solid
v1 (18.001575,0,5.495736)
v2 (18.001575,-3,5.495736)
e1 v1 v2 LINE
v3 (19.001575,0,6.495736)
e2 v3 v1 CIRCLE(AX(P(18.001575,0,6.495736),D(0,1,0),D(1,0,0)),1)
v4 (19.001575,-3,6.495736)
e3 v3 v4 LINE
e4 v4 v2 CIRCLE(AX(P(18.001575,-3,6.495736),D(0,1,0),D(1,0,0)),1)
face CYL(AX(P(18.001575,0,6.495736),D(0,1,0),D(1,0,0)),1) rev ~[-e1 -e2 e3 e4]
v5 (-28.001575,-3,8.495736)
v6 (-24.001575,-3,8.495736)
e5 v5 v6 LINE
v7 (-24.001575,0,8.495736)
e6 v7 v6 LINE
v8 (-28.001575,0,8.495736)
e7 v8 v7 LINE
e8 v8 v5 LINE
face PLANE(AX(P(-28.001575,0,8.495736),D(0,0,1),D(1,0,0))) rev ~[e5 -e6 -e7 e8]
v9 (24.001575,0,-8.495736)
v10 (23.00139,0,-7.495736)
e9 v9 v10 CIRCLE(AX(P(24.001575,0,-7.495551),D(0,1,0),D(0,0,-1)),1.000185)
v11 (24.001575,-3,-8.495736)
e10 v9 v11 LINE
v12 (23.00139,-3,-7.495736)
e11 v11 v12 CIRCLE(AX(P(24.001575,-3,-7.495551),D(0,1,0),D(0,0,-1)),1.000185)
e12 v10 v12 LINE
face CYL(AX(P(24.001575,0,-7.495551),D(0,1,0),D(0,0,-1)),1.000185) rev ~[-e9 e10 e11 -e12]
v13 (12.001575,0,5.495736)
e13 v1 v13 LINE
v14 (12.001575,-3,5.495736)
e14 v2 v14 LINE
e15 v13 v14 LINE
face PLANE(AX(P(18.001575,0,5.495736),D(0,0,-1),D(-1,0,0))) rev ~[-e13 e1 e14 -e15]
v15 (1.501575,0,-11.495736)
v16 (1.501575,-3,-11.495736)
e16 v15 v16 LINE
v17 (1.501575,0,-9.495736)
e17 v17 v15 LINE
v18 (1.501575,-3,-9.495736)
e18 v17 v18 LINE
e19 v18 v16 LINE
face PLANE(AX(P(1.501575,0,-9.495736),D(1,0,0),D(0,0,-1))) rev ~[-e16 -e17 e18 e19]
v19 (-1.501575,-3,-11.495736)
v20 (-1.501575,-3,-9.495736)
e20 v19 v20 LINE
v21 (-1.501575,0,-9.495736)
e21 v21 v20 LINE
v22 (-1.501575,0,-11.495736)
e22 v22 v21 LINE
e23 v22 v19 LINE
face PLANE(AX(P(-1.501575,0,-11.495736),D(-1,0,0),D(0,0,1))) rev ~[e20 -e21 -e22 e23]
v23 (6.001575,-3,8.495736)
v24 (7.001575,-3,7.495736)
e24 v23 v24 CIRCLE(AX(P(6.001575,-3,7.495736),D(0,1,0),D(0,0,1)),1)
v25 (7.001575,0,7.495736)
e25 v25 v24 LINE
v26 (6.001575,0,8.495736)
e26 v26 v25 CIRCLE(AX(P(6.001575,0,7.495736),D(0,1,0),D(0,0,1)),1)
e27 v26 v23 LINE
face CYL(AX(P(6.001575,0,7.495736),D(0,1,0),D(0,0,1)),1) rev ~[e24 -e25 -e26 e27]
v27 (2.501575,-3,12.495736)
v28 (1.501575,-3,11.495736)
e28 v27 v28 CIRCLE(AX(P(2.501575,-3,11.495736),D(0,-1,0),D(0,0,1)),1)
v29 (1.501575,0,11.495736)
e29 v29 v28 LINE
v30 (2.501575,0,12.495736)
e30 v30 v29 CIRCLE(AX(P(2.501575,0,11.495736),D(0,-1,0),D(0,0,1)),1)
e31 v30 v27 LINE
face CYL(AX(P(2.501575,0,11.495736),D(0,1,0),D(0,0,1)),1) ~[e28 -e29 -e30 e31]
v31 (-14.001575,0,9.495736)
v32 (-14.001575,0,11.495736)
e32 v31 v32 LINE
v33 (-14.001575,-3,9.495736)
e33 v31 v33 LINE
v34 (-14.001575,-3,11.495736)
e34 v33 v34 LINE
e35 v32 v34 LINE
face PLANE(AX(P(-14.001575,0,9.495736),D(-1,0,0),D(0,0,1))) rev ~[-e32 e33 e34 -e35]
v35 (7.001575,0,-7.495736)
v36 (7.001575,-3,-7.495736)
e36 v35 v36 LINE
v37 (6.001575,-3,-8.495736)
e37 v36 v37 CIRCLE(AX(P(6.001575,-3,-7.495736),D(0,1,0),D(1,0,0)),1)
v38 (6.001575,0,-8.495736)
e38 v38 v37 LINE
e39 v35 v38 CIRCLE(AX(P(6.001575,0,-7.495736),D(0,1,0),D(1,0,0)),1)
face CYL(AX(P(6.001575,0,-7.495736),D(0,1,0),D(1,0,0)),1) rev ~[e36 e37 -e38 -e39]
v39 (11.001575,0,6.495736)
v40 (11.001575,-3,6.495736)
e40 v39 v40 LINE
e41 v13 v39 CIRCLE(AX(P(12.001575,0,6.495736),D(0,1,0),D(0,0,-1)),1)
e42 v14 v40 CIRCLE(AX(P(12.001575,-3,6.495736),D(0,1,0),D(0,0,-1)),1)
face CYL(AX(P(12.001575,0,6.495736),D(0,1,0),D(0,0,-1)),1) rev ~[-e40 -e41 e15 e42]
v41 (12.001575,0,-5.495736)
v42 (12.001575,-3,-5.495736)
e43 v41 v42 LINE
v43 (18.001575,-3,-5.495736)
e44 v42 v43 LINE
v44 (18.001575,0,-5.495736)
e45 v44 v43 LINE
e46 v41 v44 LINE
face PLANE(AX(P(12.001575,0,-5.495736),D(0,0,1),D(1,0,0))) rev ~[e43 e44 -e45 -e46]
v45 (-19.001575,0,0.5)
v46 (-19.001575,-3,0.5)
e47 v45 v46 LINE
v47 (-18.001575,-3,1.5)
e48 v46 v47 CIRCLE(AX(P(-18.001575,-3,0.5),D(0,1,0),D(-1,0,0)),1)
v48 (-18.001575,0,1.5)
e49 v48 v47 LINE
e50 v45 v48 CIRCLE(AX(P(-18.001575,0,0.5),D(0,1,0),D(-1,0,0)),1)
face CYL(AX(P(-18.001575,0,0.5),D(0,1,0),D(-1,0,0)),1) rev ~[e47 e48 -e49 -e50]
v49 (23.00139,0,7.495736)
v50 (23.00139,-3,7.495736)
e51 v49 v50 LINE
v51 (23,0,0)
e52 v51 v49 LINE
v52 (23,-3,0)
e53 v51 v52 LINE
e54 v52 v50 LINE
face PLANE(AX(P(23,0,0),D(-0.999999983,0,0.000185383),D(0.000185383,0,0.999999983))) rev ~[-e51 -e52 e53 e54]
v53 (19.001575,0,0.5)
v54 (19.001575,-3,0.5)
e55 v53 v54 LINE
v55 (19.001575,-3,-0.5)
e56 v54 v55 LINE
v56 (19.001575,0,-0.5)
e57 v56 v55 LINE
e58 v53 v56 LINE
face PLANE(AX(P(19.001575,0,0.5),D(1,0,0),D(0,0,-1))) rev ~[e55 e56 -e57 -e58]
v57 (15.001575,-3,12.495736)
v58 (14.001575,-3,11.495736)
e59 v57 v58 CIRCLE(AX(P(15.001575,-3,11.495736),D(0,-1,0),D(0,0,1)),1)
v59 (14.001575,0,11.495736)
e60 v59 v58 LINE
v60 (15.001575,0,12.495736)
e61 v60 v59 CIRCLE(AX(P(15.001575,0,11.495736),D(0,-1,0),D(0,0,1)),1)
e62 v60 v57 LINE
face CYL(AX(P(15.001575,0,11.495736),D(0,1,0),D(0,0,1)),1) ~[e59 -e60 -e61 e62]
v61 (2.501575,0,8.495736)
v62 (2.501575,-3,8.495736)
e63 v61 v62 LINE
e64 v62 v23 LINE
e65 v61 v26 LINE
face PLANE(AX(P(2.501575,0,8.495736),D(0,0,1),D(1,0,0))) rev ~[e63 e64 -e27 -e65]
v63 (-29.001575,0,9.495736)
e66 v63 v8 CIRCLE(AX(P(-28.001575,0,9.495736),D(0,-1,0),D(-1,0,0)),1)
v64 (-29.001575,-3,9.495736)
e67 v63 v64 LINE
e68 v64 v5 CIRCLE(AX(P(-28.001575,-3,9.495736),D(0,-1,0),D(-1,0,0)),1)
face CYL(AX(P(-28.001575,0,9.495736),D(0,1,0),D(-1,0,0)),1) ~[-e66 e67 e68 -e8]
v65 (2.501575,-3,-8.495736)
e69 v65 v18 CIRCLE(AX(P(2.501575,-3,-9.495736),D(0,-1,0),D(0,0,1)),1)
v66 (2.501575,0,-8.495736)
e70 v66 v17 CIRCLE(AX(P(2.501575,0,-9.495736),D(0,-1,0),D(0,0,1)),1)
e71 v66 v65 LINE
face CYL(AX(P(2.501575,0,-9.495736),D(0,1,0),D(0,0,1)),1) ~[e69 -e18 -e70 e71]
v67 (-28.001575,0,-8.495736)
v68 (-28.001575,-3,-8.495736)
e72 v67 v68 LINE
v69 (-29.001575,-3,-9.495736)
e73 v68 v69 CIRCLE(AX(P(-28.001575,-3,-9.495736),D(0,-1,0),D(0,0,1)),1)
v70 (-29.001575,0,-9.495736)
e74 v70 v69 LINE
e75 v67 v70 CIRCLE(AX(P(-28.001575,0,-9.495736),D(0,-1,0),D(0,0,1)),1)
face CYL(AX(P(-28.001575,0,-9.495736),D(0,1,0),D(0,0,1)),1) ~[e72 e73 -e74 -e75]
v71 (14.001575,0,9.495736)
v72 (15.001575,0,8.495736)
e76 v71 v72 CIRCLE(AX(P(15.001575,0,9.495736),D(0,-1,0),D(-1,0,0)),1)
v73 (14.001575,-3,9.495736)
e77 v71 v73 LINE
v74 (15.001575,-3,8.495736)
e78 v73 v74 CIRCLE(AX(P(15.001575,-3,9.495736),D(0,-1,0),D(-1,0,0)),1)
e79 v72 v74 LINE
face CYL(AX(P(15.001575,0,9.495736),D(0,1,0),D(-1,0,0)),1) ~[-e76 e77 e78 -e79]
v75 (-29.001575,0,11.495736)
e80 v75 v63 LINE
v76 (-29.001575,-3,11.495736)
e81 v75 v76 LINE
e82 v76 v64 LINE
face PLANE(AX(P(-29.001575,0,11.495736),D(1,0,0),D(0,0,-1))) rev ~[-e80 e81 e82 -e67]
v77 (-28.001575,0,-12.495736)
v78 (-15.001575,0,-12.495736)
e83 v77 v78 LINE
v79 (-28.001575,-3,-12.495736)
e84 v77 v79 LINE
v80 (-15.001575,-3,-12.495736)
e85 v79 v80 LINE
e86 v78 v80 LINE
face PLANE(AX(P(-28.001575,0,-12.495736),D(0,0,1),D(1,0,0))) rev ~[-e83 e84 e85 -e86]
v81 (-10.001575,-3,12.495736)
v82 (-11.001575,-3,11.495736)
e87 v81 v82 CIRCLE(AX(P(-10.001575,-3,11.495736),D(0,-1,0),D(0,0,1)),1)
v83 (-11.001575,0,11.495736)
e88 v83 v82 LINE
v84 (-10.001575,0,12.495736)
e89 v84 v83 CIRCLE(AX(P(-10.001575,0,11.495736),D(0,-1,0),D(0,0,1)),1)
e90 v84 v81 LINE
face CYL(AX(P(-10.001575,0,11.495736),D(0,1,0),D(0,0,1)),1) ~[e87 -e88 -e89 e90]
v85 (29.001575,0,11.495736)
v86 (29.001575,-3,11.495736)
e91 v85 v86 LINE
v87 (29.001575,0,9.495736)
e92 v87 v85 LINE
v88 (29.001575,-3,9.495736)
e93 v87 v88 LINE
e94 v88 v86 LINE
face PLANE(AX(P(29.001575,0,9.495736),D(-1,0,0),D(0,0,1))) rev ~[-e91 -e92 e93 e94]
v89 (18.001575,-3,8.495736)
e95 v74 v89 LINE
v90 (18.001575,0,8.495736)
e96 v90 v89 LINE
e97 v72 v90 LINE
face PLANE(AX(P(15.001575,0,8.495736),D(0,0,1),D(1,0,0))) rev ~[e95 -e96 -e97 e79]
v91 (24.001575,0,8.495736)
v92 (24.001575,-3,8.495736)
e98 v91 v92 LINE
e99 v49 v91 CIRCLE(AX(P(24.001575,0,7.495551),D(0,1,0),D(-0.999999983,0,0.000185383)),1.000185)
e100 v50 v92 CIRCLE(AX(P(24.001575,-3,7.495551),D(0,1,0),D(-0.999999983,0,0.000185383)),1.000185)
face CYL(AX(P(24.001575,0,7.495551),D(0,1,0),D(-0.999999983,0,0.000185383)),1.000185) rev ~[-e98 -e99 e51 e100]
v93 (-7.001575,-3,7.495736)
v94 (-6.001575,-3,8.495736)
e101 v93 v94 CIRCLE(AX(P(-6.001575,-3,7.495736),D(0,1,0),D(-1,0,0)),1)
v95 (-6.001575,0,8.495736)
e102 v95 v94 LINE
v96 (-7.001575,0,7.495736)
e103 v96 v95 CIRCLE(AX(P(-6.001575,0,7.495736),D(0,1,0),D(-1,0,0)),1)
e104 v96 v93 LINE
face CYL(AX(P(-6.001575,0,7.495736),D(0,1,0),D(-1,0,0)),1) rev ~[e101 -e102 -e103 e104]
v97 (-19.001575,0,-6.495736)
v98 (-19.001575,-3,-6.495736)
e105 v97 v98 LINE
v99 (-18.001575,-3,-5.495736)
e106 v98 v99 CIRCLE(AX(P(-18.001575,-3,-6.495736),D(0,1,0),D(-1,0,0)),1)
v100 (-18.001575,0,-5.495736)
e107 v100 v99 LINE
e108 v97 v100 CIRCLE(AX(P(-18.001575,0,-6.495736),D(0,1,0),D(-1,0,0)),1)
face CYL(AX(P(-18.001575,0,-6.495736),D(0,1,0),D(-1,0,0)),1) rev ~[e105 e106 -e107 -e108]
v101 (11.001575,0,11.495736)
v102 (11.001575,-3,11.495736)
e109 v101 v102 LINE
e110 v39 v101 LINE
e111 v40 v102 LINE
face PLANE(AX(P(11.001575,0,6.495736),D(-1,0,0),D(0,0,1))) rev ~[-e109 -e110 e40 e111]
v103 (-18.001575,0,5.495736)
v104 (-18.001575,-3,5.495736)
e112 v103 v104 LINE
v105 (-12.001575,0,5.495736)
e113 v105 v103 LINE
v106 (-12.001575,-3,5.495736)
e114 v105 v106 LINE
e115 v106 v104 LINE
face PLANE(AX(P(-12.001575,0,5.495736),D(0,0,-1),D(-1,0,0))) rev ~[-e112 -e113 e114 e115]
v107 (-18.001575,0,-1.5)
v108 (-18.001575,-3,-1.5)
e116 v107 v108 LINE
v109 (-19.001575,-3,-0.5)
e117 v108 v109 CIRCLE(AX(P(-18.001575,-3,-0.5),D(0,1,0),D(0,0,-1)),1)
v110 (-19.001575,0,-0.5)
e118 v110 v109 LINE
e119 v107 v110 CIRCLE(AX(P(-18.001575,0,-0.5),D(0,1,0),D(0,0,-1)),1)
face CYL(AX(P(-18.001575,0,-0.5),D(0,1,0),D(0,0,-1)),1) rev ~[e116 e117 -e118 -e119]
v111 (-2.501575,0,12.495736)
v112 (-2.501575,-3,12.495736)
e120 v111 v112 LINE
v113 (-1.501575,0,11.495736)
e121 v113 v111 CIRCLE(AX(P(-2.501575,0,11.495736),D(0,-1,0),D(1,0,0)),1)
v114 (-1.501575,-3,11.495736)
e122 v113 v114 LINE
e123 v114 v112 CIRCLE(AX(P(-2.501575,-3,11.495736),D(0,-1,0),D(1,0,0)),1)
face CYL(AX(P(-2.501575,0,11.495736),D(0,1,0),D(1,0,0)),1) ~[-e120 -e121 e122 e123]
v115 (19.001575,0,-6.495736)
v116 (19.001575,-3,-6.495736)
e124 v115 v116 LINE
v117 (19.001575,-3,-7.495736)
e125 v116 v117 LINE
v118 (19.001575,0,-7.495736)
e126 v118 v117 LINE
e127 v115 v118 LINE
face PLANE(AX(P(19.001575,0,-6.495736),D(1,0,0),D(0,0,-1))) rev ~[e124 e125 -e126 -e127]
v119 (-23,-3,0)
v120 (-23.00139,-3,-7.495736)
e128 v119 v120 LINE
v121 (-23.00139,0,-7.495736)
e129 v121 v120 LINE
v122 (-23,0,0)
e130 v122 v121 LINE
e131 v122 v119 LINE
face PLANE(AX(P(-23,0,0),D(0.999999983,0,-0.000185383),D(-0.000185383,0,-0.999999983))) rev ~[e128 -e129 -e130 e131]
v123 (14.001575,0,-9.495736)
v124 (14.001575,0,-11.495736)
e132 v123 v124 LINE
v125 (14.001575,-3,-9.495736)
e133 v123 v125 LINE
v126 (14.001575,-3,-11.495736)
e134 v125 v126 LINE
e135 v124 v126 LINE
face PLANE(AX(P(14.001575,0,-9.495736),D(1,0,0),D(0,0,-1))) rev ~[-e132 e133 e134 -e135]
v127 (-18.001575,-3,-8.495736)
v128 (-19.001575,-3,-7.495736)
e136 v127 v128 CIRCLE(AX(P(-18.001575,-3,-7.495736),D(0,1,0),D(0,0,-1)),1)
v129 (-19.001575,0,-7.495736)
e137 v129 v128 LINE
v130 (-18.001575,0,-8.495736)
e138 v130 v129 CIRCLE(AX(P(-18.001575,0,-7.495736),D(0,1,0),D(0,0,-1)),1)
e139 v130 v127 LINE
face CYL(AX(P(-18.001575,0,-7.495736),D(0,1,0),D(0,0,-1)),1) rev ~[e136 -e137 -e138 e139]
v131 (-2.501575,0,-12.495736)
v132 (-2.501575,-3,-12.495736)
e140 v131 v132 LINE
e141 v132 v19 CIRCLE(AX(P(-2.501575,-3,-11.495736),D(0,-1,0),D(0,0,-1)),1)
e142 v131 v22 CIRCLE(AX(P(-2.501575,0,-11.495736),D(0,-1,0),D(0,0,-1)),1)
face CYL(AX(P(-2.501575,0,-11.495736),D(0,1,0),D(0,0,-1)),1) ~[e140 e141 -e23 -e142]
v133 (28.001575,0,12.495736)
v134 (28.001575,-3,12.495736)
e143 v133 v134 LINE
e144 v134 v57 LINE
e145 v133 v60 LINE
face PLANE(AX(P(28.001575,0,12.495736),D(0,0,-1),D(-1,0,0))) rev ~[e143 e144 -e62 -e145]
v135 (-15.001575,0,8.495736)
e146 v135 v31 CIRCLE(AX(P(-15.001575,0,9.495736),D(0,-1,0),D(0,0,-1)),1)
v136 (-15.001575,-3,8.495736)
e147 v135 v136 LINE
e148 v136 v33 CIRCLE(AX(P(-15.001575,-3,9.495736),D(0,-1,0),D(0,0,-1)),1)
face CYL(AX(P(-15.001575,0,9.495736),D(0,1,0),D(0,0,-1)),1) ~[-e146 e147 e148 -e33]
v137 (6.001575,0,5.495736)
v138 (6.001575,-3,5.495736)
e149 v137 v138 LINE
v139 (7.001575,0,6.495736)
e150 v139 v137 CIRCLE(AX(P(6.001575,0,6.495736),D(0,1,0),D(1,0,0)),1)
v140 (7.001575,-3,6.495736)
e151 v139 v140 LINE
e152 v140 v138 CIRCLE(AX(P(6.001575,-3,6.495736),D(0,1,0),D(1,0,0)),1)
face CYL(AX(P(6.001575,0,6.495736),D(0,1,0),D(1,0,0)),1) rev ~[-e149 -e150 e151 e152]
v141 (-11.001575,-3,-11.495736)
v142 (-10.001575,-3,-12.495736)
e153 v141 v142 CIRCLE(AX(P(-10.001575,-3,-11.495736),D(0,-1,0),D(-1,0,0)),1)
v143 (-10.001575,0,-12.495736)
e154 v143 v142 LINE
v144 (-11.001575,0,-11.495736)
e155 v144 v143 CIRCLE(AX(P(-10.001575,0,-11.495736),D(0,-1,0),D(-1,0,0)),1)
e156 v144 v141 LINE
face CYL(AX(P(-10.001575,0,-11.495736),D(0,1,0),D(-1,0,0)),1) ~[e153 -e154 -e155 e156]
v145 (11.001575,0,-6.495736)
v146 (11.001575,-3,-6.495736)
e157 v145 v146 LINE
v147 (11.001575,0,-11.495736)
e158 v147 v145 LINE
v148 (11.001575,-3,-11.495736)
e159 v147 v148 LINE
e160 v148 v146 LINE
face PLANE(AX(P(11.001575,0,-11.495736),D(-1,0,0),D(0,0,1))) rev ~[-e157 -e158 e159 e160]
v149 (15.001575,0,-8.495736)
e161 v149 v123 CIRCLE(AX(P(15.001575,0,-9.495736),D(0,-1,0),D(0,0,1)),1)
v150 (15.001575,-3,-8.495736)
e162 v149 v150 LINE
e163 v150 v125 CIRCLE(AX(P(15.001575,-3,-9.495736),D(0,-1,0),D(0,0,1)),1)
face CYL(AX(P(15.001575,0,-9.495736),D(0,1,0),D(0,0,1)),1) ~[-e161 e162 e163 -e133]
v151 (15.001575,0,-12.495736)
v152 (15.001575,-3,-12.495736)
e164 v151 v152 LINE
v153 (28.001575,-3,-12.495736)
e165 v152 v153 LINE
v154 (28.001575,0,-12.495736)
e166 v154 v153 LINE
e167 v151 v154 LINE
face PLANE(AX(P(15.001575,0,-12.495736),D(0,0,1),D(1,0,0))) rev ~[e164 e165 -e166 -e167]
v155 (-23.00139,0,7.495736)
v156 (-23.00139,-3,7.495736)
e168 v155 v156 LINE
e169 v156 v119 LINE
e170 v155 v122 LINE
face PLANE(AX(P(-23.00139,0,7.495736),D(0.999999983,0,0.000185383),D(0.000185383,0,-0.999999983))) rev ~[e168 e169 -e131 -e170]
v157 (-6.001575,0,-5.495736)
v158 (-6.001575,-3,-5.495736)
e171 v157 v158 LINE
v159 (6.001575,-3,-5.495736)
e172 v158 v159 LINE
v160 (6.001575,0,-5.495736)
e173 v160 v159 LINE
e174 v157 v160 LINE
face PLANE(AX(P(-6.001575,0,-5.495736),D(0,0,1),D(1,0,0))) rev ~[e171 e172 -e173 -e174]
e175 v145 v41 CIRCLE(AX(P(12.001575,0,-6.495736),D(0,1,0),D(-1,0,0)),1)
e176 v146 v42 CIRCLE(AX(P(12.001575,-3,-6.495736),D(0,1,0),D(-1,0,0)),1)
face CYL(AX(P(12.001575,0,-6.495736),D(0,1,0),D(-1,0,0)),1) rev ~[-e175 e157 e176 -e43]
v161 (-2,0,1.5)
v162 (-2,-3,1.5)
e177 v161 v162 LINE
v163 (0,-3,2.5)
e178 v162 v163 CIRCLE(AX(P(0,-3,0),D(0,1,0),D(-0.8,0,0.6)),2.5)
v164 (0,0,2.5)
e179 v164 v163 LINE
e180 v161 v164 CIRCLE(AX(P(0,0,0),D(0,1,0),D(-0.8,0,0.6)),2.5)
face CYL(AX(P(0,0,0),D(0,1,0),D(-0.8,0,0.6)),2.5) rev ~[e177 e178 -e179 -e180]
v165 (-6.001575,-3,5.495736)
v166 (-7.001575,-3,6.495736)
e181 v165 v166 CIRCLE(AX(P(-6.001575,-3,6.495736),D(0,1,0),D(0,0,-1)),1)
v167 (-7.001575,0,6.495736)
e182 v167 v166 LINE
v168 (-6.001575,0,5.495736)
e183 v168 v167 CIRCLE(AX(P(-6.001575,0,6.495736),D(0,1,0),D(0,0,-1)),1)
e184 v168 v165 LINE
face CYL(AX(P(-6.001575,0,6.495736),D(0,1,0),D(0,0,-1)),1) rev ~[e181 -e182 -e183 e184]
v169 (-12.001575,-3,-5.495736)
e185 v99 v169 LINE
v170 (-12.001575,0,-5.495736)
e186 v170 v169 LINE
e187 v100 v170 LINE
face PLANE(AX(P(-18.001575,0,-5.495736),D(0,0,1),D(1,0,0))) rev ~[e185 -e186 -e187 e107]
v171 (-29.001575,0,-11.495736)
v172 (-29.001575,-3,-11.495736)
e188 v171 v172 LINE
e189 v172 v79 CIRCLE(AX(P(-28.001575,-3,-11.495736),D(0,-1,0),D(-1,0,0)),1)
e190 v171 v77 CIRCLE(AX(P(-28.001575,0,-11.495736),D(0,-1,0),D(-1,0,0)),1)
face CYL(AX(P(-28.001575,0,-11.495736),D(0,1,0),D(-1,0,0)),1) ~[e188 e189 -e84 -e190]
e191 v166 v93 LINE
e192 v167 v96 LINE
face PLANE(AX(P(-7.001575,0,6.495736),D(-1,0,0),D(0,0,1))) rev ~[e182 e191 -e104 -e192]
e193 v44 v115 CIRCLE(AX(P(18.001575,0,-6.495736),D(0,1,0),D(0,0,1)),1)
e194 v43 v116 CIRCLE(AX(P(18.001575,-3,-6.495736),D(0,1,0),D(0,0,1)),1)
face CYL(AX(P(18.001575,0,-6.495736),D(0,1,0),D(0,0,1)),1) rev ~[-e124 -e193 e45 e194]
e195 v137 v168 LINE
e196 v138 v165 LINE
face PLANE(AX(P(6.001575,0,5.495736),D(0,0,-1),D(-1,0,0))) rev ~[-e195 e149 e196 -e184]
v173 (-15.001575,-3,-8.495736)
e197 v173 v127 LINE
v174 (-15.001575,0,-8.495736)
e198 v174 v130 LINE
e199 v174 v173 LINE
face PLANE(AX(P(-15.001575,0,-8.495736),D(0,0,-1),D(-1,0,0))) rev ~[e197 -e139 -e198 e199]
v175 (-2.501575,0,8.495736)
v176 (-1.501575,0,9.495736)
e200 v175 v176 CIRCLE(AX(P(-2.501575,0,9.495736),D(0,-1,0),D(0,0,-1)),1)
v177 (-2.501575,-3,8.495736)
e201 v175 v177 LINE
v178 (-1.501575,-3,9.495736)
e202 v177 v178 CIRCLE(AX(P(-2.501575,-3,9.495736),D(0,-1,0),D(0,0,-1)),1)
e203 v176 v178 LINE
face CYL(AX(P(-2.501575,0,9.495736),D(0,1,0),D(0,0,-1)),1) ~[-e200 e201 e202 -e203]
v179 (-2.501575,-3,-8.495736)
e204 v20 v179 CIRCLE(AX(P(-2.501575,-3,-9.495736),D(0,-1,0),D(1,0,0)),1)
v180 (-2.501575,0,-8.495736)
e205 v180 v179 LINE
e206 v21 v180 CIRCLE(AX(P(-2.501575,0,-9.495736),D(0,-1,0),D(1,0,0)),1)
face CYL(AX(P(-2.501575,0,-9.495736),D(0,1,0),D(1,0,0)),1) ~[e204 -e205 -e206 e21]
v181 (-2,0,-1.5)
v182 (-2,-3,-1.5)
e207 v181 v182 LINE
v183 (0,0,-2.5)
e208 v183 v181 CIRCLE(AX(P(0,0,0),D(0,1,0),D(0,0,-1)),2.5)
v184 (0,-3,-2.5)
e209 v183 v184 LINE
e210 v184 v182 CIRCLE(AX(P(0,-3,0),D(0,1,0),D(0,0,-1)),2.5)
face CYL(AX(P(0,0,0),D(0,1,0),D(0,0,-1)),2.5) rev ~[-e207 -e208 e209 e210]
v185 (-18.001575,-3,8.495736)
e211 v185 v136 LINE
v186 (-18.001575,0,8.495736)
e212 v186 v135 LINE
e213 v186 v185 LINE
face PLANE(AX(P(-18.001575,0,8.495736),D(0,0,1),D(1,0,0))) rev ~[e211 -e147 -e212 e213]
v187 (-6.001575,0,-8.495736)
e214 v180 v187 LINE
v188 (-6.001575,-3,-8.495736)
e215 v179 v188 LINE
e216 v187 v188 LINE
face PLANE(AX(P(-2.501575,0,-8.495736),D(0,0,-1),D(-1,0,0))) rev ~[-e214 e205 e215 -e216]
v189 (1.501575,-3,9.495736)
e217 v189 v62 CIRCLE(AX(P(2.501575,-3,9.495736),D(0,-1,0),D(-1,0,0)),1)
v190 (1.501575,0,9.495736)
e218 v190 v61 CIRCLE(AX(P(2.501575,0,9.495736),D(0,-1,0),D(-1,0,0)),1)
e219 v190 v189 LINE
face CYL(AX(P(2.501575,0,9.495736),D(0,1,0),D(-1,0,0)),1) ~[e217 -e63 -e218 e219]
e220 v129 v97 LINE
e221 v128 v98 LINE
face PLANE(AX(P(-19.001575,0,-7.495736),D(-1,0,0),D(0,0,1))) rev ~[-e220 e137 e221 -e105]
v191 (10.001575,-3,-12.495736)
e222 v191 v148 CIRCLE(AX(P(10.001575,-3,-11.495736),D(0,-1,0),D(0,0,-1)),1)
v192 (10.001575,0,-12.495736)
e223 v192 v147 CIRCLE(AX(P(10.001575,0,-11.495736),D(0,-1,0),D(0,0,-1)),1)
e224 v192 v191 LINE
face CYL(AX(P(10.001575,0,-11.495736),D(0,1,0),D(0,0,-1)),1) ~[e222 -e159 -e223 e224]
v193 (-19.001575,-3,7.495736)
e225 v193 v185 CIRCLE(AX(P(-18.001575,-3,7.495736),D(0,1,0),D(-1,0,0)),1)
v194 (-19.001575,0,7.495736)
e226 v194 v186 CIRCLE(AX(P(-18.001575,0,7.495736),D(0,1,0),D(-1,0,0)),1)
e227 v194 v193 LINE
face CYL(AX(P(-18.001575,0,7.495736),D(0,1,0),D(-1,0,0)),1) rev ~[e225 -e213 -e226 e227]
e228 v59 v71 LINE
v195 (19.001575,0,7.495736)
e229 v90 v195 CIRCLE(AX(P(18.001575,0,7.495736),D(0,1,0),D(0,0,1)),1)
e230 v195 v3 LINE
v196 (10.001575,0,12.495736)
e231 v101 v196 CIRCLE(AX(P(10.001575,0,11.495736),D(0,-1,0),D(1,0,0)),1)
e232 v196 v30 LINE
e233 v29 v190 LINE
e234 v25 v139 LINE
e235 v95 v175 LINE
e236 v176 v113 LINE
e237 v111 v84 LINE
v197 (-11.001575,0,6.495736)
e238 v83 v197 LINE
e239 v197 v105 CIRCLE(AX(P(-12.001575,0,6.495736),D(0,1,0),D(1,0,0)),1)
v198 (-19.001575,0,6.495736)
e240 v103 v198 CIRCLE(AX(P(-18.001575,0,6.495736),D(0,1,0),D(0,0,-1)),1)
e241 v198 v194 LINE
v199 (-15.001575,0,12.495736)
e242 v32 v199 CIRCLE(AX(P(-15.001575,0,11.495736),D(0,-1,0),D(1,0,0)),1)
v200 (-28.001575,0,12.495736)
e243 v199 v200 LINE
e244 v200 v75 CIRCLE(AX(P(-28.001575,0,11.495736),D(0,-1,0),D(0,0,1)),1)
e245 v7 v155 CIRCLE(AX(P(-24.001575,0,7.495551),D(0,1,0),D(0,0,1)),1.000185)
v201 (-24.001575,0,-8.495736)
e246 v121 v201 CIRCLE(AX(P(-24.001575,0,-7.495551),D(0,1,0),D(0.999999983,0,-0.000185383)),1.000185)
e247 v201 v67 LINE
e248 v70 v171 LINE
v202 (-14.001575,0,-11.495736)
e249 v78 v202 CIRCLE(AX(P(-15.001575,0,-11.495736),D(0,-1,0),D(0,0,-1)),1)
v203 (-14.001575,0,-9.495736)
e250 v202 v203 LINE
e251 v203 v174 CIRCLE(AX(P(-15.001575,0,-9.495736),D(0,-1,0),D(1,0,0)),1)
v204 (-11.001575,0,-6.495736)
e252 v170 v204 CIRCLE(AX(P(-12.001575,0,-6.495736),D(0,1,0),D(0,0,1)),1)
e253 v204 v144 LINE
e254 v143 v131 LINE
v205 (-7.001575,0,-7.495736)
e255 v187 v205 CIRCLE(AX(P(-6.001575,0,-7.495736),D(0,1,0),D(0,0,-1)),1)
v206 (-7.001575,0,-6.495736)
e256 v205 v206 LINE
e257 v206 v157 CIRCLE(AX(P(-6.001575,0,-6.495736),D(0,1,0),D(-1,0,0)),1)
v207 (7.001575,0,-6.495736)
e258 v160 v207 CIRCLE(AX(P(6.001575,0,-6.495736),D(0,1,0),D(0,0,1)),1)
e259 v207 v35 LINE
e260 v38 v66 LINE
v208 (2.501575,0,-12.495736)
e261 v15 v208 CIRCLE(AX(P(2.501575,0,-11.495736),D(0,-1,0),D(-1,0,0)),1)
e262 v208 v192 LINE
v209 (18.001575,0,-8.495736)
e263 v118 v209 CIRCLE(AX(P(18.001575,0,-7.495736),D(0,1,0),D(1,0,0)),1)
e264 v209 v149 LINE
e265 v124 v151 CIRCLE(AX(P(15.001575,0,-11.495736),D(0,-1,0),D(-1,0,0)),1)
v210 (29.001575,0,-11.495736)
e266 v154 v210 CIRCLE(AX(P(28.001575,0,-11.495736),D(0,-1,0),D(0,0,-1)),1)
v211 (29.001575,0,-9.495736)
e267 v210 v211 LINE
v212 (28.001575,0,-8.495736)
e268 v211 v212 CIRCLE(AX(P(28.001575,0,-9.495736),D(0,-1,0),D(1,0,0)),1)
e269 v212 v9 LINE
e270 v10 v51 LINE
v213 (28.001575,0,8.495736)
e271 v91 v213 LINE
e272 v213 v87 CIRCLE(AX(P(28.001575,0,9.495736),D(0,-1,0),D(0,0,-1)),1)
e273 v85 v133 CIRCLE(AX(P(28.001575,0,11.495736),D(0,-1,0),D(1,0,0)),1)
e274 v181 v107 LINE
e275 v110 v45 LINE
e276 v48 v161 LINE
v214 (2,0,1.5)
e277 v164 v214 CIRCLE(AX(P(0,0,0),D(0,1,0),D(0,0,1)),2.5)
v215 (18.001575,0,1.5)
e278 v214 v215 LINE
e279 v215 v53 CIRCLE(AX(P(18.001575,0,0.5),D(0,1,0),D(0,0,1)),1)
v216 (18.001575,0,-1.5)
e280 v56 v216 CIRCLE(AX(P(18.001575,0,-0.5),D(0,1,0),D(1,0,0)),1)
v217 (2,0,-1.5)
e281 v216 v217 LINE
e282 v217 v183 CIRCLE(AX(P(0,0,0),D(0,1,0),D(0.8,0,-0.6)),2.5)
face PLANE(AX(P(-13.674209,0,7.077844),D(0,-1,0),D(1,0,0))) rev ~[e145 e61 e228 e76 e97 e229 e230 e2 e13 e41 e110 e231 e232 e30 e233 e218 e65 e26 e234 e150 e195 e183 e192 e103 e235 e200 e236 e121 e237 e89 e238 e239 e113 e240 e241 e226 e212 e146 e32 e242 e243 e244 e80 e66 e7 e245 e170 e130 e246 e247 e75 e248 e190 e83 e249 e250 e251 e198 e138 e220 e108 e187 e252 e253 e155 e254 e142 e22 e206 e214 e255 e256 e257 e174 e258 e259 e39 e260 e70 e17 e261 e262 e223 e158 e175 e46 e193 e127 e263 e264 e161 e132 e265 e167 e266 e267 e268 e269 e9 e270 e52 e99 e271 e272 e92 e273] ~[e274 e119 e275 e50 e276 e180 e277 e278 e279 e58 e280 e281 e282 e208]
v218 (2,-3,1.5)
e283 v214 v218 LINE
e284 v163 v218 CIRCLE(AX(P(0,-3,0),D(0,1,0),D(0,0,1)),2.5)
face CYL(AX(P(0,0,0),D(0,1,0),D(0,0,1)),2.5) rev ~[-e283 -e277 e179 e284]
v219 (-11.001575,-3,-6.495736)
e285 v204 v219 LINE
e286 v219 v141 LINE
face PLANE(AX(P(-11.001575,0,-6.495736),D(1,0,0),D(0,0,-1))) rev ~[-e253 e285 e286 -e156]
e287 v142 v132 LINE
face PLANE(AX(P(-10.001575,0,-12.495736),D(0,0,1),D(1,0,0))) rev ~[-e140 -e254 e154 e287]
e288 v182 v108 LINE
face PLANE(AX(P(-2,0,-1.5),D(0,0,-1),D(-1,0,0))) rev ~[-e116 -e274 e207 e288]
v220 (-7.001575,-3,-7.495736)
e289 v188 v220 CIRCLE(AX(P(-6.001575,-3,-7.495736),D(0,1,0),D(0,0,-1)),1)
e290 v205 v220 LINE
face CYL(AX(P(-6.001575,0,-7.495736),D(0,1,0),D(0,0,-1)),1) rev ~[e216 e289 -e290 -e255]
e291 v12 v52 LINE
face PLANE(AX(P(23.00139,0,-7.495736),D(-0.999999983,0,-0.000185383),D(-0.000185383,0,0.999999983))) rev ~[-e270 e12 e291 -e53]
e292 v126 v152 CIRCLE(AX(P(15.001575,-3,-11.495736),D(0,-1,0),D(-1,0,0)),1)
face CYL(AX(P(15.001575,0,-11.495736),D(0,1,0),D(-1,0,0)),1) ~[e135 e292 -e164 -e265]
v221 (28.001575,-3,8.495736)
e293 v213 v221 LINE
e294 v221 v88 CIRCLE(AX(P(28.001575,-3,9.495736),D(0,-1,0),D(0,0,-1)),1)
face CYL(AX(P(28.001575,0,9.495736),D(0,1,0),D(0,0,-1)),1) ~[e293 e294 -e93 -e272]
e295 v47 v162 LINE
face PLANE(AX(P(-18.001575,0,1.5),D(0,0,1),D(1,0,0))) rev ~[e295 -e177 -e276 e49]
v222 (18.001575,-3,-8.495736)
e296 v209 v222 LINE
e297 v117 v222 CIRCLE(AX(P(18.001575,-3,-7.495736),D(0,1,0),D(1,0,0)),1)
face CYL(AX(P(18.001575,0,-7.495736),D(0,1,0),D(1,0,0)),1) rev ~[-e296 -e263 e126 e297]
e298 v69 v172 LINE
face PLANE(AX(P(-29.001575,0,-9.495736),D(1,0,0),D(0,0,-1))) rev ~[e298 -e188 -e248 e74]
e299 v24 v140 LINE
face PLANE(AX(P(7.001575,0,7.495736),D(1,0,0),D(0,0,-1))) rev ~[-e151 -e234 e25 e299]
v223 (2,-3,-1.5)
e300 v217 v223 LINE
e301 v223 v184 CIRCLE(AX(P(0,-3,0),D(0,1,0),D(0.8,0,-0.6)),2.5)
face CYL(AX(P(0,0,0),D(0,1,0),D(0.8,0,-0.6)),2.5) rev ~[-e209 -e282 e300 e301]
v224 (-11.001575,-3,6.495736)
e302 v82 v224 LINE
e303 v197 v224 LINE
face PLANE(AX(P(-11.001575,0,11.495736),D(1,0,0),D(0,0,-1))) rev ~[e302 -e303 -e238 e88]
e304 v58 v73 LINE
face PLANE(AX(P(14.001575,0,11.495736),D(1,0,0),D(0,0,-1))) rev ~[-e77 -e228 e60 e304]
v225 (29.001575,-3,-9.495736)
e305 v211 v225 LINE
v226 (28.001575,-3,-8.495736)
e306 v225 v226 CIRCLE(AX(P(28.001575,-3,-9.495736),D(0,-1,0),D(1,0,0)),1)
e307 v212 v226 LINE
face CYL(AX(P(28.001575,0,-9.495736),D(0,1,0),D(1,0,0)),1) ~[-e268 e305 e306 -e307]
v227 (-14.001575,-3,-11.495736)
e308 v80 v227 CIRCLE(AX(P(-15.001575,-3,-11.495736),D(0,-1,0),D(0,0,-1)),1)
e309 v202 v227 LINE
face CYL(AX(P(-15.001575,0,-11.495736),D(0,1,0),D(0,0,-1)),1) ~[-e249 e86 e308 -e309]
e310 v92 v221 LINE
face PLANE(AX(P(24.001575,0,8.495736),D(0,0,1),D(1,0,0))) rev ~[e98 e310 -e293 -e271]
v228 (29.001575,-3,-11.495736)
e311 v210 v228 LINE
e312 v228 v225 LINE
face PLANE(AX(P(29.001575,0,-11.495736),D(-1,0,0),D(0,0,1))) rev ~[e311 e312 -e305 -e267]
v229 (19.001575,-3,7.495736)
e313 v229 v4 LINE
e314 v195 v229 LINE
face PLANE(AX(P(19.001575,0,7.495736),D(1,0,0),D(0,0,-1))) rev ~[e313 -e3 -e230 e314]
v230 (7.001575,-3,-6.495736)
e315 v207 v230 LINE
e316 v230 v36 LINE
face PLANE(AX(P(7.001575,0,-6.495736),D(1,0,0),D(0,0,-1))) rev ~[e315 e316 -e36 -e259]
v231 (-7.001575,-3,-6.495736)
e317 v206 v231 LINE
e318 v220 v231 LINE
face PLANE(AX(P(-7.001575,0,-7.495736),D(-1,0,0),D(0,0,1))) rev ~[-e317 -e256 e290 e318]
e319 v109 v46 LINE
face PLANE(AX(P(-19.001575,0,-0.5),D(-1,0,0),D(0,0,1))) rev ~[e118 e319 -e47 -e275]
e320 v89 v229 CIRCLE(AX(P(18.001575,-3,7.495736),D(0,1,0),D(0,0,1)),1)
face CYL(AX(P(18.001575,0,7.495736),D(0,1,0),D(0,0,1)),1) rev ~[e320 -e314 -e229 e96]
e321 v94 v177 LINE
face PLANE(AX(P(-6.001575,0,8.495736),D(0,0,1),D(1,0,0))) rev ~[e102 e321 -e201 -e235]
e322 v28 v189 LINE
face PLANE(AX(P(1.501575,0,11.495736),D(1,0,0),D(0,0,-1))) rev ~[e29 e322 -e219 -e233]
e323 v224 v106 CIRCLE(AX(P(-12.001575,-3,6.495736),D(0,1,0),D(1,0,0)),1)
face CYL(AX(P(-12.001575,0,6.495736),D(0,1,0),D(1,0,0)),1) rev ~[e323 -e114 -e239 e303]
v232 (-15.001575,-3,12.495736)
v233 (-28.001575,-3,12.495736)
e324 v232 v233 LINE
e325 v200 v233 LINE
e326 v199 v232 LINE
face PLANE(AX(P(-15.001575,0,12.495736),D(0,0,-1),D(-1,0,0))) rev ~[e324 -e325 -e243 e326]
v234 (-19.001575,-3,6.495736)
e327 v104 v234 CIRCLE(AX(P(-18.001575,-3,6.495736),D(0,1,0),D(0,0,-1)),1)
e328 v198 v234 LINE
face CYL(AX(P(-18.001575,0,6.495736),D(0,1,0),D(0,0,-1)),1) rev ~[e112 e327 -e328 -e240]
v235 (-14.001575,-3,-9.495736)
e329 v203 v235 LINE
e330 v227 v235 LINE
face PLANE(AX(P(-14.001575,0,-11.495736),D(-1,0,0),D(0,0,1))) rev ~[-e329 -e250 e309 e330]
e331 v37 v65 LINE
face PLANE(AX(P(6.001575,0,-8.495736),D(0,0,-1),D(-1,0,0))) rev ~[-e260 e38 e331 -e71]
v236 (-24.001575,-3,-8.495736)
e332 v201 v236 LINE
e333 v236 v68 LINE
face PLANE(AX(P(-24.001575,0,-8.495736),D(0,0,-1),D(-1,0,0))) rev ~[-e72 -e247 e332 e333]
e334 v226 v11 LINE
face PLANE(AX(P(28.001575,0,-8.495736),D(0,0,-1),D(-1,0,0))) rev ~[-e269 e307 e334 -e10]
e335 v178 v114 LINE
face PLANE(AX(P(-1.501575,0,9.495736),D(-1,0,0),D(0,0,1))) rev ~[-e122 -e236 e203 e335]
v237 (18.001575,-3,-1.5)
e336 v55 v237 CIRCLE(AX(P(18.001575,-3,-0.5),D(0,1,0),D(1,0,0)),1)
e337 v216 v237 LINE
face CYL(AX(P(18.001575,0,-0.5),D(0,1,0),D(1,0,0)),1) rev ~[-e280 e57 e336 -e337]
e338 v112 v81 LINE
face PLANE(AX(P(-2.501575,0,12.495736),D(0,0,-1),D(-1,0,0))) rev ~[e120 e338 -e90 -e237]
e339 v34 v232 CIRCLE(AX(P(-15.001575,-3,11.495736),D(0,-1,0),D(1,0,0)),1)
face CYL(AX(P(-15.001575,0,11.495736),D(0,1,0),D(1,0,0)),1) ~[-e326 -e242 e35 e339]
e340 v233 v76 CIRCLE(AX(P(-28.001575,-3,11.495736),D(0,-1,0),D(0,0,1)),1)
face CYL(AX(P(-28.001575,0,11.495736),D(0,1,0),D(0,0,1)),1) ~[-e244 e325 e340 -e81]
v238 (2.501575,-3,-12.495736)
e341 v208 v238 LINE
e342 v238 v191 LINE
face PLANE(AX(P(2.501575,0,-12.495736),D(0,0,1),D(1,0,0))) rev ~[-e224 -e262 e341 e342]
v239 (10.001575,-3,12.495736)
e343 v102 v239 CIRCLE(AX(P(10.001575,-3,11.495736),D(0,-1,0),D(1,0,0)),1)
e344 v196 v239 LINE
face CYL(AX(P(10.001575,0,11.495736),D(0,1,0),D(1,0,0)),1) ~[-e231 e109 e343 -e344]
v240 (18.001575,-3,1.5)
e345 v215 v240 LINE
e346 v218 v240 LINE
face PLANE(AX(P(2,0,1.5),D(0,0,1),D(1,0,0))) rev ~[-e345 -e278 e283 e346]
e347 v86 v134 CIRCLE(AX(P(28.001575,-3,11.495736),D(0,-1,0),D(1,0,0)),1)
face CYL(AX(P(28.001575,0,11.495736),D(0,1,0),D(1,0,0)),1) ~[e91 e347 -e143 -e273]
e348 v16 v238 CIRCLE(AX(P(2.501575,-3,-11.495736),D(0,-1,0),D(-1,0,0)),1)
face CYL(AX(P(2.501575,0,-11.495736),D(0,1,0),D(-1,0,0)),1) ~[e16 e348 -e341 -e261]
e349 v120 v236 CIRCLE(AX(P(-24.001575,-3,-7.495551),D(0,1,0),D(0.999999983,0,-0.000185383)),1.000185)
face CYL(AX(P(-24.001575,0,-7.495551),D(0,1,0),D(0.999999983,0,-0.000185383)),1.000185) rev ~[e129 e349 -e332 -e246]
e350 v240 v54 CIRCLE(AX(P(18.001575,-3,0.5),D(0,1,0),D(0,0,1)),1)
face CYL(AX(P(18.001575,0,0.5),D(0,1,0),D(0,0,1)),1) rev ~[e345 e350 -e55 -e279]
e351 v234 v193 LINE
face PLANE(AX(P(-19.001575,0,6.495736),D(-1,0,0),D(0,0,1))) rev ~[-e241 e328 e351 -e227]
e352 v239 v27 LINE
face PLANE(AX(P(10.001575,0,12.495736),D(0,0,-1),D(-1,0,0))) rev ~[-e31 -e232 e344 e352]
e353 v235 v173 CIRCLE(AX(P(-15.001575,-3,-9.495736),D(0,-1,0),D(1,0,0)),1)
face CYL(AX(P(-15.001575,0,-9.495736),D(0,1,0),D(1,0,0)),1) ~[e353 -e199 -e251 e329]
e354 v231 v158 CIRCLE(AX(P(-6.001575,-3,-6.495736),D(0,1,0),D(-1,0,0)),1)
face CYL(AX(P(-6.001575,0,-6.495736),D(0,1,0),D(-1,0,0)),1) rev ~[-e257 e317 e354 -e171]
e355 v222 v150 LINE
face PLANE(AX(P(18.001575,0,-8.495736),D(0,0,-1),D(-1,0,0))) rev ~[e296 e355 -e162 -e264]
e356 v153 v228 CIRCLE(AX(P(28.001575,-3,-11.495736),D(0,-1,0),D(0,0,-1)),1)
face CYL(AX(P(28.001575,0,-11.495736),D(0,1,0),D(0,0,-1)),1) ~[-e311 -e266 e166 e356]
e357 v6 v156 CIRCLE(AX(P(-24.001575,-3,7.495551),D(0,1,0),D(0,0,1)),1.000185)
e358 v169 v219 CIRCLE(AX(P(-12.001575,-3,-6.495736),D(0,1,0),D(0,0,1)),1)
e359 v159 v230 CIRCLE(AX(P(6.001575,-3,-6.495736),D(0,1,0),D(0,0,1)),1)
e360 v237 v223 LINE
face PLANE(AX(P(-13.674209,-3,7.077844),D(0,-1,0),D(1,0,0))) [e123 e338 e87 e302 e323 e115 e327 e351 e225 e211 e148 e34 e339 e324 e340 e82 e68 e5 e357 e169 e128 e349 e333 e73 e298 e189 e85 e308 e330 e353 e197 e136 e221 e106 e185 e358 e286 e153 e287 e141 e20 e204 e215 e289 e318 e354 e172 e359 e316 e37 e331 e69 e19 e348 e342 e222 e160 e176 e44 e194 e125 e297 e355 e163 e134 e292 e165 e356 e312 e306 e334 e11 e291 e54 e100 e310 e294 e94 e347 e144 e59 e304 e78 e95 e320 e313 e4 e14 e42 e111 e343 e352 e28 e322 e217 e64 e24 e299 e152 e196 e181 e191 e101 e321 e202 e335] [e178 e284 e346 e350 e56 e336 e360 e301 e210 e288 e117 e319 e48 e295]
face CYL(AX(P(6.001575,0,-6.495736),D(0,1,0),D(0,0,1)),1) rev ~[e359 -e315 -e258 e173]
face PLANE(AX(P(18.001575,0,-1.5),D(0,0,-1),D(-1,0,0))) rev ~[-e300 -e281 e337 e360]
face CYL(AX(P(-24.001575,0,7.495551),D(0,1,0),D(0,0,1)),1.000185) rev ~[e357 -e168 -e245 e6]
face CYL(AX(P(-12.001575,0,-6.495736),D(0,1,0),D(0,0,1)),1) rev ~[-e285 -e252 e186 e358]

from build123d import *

# Parameters (mm, degrees)
F1_DEPTH = 3


# Not quite as in the source:
# - a feature names something its author has since deleted; it is built from what else it names


with BuildPart() as f1:
    # F0 (on Front) → F1 (new body)
    with BuildSketch(Plane.XZ):
        with BuildLine():
            Line((-23.0000003952, 0), (-19.0015753579, 0))
            Line((-19.0015753579, 0), (-19.0015753579, 0.5))
            ThreePointArc((-19.0015753579, 0.5), (-18.7086821391, 1.2071067812), (-18.0015753579, 1.5))
            Line((-18.0015753579, 1.5), (-2, 1.5))
            ThreePointArc((-2, 1.5), (-1.1180339887, 2.2360679775), (0, 2.5))
            Line((0, 2.5), (0, 5.4957361976))
            Line((0, 5.4957361976), (-6.0015753579, 5.4957361976))
            ThreePointArc((-6.0015753579, 5.4957361976), (-6.7086821391, 5.7886294164), (-7.0015753579, 6.4957361976))
            Line((-7.0015753579, 6.4957361976), (-7.0015753579, 7.4957361976))
            ThreePointArc((-7.0015753579, 7.4957361976), (-6.7086821391, 8.2028429788), (-6.0015753579, 8.4957361976))
            Line((-6.0015753579, 8.4957361976), (-2.5015753579, 8.4957361976))
            ThreePointArc((-2.5015753579, 8.4957361976), (-1.7944685767, 8.7886294164), (-1.5015753579, 9.4957361976))
            Line((-1.5015753579, 9.4957361976), (-1.5015753579, 11.4957361976))
            ThreePointArc((-1.5015753579, 11.4957361976), (-1.7944685767, 12.2028429788), (-2.5015753579, 12.4957361976))
            Line((-2.5015753579, 12.4957361976), (-10.0015753579, 12.4957361976))
            ThreePointArc((-10.0015753579, 12.4957361976), (-10.7086821391, 12.2028429788), (-11.0015753579, 11.4957361976))
            Line((-11.0015753579, 11.4957361976), (-11.0015753579, 8.4957361976))
            Line((-11.0015753579, 8.4957361976), (-11.0015753579, 6.4957361976))
            ThreePointArc((-11.0015753579, 6.4957361976), (-11.2944685767, 5.7886294164), (-12.0015753579, 5.4957361976))
            Line((-12.0015753579, 5.4957361976), (-18.0015753579, 5.4957361976))
            ThreePointArc((-18.0015753579, 5.4957361976), (-18.7086821391, 5.7886294164), (-19.0015753579, 6.4957361976))
            Line((-19.0015753579, 6.4957361976), (-19.0015753579, 7.4957361976))
            ThreePointArc((-19.0015753579, 7.4957361976), (-18.7086821391, 8.2028429788), (-18.0015753579, 8.4957361976))
            Line((-18.0015753579, 8.4957361976), (-15.0015753579, 8.4957361976))
            ThreePointArc((-15.0015753579, 8.4957361976), (-14.2944685767, 8.7886294164), (-14.0015753579, 9.4957361976))
            Line((-14.0015753579, 9.4957361976), (-14.0015753579, 11.4957361976))
            ThreePointArc((-14.0015753579, 11.4957361976), (-14.2944685767, 12.2028429788), (-15.0015753579, 12.4957361976))
            Line((-15.0015753579, 12.4957361976), (-28.0015753579, 12.4957361976))
            ThreePointArc((-28.0015753579, 12.4957361976), (-28.7086821391, 12.2028429788), (-29.0015753579, 11.4957361976))
            Line((-29.0015753579, 11.4957361976), (-29.0015753579, 9.4957361976))
            ThreePointArc((-29.0015753579, 9.4957361976), (-28.7086821391, 8.7886294164), (-28.0015753579, 8.4957361976))
            Line((-28.0015753579, 8.4957361976), (-24.0015753579, 8.4957361976))
            ThreePointArc((-24.0015753579, 8.4957361976), (-23.294403037, 8.2028542282), (-23.0013899752, 7.4957362148))
            Line((-23.0013899752, 7.4957362148), (-23.0000003952, 0))
        make_face()
        with BuildLine():
            Line((19.0015753579, 0.5), (19.0015753579, 0))
            Line((19.0015753579, 0), (23.0000003952, 0))
            Line((23.0000003952, 0), (23.0013899752, 7.4957362148))
            ThreePointArc((23.0013899752, 7.4957362148), (23.294403037, 8.2028542282), (24.0015753579, 8.4957361976))
            Line((24.0015753579, 8.4957361976), (28.0015753579, 8.4957361976))
            ThreePointArc((28.0015753579, 8.4957361976), (28.7086821391, 8.7886294164), (29.0015753579, 9.4957361976))
            Line((29.0015753579, 9.4957361976), (29.0015753579, 11.4957361976))
            ThreePointArc((29.0015753579, 11.4957361976), (28.7086821391, 12.2028429788), (28.0015753579, 12.4957361976))
            Line((28.0015753579, 12.4957361976), (15.0015753579, 12.4957361976))
            ThreePointArc((15.0015753579, 12.4957361976), (14.2944685767, 12.2028429788), (14.0015753579, 11.4957361976))
            Line((14.0015753579, 11.4957361976), (14.0015753579, 9.4957361976))
            ThreePointArc((14.0015753579, 9.4957361976), (14.2944685767, 8.7886294164), (15.0015753579, 8.4957361976))
            Line((15.0015753579, 8.4957361976), (18.0015753579, 8.4957361976))
            ThreePointArc((18.0015753579, 8.4957361976), (18.7086821391, 8.2028429788), (19.0015753579, 7.4957361976))
            Line((19.0015753579, 7.4957361976), (19.0015753579, 6.4957361976))
            ThreePointArc((19.0015753579, 6.4957361976), (18.7086821391, 5.7886294164), (18.0015753579, 5.4957361976))
            Line((18.0015753579, 5.4957361976), (12.0015753579, 5.4957361976))
            ThreePointArc((12.0015753579, 5.4957361976), (11.2944685767, 5.7886294164), (11.0015753579, 6.4957361976))
            Line((11.0015753579, 6.4957361976), (11.0015753579, 8.4957361976))
            Line((11.0015753579, 8.4957361976), (11.0015753579, 11.4957361976))
            ThreePointArc((11.0015753579, 11.4957361976), (10.7086821391, 12.2028429788), (10.0015753579, 12.4957361976))
            Line((10.0015753579, 12.4957361976), (2.5015753579, 12.4957361976))
            ThreePointArc((2.5015753579, 12.4957361976), (1.7944685767, 12.2028429788), (1.5015753579, 11.4957361976))
            Line((1.5015753579, 11.4957361976), (1.5015753579, 9.4957361976))
            ThreePointArc((1.5015753579, 9.4957361976), (1.7944685767, 8.7886294164), (2.5015753579, 8.4957361976))
            Line((2.5015753579, 8.4957361976), (6.0015753579, 8.4957361976))
            ThreePointArc((6.0015753579, 8.4957361976), (6.7086821391, 8.2028429788), (7.0015753579, 7.4957361976))
            Line((7.0015753579, 7.4957361976), (7.0015753579, 6.4957361976))
            ThreePointArc((7.0015753579, 6.4957361976), (6.7086821391, 5.7886294164), (6.0015753579, 5.4957361976))
            Line((6.0015753579, 5.4957361976), (0, 5.4957361976))
            Line((0, 5.4957361976), (0, 2.5))
            ThreePointArc((0, 2.5), (1.1180339887, 2.2360679775), (2, 1.5))
            Line((2, 1.5), (18.0015753579, 1.5))
            ThreePointArc((18.0015753579, 1.5), (18.7086821391, 1.2071067812), (19.0015753579, 0.5))
        make_face()
        with BuildLine():
            Line((-6.0015753579, -5.4957361976), (0, -5.4957361976))
            Line((0, -5.4957361976), (0, -2.5))
            ThreePointArc((0, -2.5), (-1.1180339887, -2.2360679775), (-2, -1.5))
            Line((-2, -1.5), (-18.0015753579, -1.5))
            ThreePointArc((-18.0015753579, -1.5), (-18.7086821391, -1.2071067812), (-19.0015753579, -0.5))
            Line((-19.0015753579, -0.5), (-19.0015753579, 0))
            Line((-19.0015753579, 0), (-23.0000003952, 0))
            Line((-23.0000003952, 0), (-23.0013899752, -7.4957362148))
            ThreePointArc((-23.0013899752, -7.4957362148), (-23.294403037, -8.2028542282), (-24.0015753579, -8.4957361976))
            Line((-24.0015753579, -8.4957361976), (-28.0015753579, -8.4957361976))
            ThreePointArc((-28.0015753579, -8.4957361976), (-28.7086821391, -8.7886294164), (-29.0015753579, -9.4957361976))
            Line((-29.0015753579, -9.4957361976), (-29.0015753579, -11.4957361976))
            ThreePointArc((-29.0015753579, -11.4957361976), (-28.7086821391, -12.2028429788), (-28.0015753579, -12.4957361976))
            Line((-28.0015753579, -12.4957361976), (-15.0015753579, -12.4957361976))
            ThreePointArc((-15.0015753579, -12.4957361976), (-14.2944685767, -12.2028429788), (-14.0015753579, -11.4957361976))
            Line((-14.0015753579, -11.4957361976), (-14.0015753579, -9.4957361976))
            ThreePointArc((-14.0015753579, -9.4957361976), (-14.2944685767, -8.7886294164), (-15.0015753579, -8.4957361976))
            Line((-15.0015753579, -8.4957361976), (-18.0015753579, -8.4957361976))
            ThreePointArc((-18.0015753579, -8.4957361976), (-18.7086821391, -8.2028429788), (-19.0015753579, -7.4957361976))
            Line((-19.0015753579, -7.4957361976), (-19.0015753579, -6.4957361976))
            ThreePointArc((-19.0015753579, -6.4957361976), (-18.7086821391, -5.7886294164), (-18.0015753579, -5.4957361976))
            Line((-18.0015753579, -5.4957361976), (-12.0015753579, -5.4957361976))
            ThreePointArc((-12.0015753579, -5.4957361976), (-11.2944685767, -5.7886294164), (-11.0015753579, -6.4957361976))
            Line((-11.0015753579, -6.4957361976), (-11.0015753579, -8.4957361976))
            Line((-11.0015753579, -8.4957361976), (-11.0015753579, -11.4957361976))
            ThreePointArc((-11.0015753579, -11.4957361976), (-10.7086821391, -12.2028429788), (-10.0015753579, -12.4957361976))
            Line((-10.0015753579, -12.4957361976), (-2.5015753579, -12.4957361976))
            ThreePointArc((-2.5015753579, -12.4957361976), (-1.7944685767, -12.2028429788), (-1.5015753579, -11.4957361976))
            Line((-1.5015753579, -11.4957361976), (-1.5015753579, -9.4957361976))
            ThreePointArc((-1.5015753579, -9.4957361976), (-1.7944685767, -8.7886294164), (-2.5015753579, -8.4957361976))
            Line((-2.5015753579, -8.4957361976), (-6.0015753579, -8.4957361976))
            ThreePointArc((-6.0015753579, -8.4957361976), (-6.7086821391, -8.2028429788), (-7.0015753579, -7.4957361976))
            Line((-7.0015753579, -7.4957361976), (-7.0015753579, -6.4957361976))
            ThreePointArc((-7.0015753579, -6.4957361976), (-6.7086821391, -5.7886294164), (-6.0015753579, -5.4957361976))
        make_face()
        with BuildLine():
            ThreePointArc((1.5015753579, -11.4957361976), (1.7944685767, -12.2028429788), (2.5015753579, -12.4957361976))
            Line((2.5015753579, -12.4957361976), (10.0015753579, -12.4957361976))
            ThreePointArc((10.0015753579, -12.4957361976), (10.7086821391, -12.2028429788), (11.0015753579, -11.4957361976))
            Line((11.0015753579, -11.4957361976), (11.0015753579, -8.4957361976))
            Line((11.0015753579, -8.4957361976), (11.0015753579, -6.4957361976))
            ThreePointArc((11.0015753579, -6.4957361976), (11.2944685767, -5.7886294164), (12.0015753579, -5.4957361976))
            Line((12.0015753579, -5.4957361976), (18.0015753579, -5.4957361976))
            ThreePointArc((18.0015753579, -5.4957361976), (18.7086821391, -5.7886294164), (19.0015753579, -6.4957361976))
            Line((19.0015753579, -6.4957361976), (19.0015753579, -7.4957361976))
            ThreePointArc((19.0015753579, -7.4957361976), (18.7086821391, -8.2028429788), (18.0015753579, -8.4957361976))
            Line((18.0015753579, -8.4957361976), (15.0015753579, -8.4957361976))
            ThreePointArc((15.0015753579, -8.4957361976), (14.2944685767, -8.7886294164), (14.0015753579, -9.4957361976))
            Line((14.0015753579, -9.4957361976), (14.0015753579, -11.4957361976))
            ThreePointArc((14.0015753579, -11.4957361976), (14.2944685767, -12.2028429788), (15.0015753579, -12.4957361976))
            Line((15.0015753579, -12.4957361976), (28.0015753579, -12.4957361976))
            ThreePointArc((28.0015753579, -12.4957361976), (28.7086821391, -12.2028429788), (29.0015753579, -11.4957361976))
            Line((29.0015753579, -11.4957361976), (29.0015753579, -9.4957361976))
            ThreePointArc((29.0015753579, -9.4957361976), (28.7086821391, -8.7886294164), (28.0015753579, -8.4957361976))
            Line((28.0015753579, -8.4957361976), (24.0015753579, -8.4957361976))
            ThreePointArc((24.0015753579, -8.4957361976), (23.294403037, -8.2028542282), (23.0013899752, -7.4957362148))
            Line((23.0013899752, -7.4957362148), (23.0000003952, 0))
            Line((23.0000003952, 0), (19.0015753579, 0))
            Line((19.0015753579, 0), (19.0015753579, -0.5))
            ThreePointArc((19.0015753579, -0.5), (18.7086821391, -1.2071067812), (18.0015753579, -1.5))
            Line((18.0015753579, -1.5), (2, -1.5))
            ThreePointArc((2, -1.5), (1.1180339887, -2.2360679775), (0, -2.5))
            Line((0, -2.5), (0, -5.4957361976))
            Line((0, -5.4957361976), (6.0015753579, -5.4957361976))
            ThreePointArc((6.0015753579, -5.4957361976), (6.7086821391, -5.7886294164), (7.0015753579, -6.4957361976))
            Line((7.0015753579, -6.4957361976), (7.0015753579, -7.4957361976))
            ThreePointArc((7.0015753579, -7.4957361976), (6.7086821391, -8.2028429788), (6.0015753579, -8.4957361976))
            Line((6.0015753579, -8.4957361976), (2.5015753579, -8.4957361976))
            ThreePointArc((2.5015753579, -8.4957361976), (1.7944685767, -8.7886294164), (1.5015753579, -9.4957361976))
            Line((1.5015753579, -9.4957361976), (1.5015753579, -11.4957361976))
        make_face()
    extrude(amount=F1_DEPTH)


solid = f1.part
